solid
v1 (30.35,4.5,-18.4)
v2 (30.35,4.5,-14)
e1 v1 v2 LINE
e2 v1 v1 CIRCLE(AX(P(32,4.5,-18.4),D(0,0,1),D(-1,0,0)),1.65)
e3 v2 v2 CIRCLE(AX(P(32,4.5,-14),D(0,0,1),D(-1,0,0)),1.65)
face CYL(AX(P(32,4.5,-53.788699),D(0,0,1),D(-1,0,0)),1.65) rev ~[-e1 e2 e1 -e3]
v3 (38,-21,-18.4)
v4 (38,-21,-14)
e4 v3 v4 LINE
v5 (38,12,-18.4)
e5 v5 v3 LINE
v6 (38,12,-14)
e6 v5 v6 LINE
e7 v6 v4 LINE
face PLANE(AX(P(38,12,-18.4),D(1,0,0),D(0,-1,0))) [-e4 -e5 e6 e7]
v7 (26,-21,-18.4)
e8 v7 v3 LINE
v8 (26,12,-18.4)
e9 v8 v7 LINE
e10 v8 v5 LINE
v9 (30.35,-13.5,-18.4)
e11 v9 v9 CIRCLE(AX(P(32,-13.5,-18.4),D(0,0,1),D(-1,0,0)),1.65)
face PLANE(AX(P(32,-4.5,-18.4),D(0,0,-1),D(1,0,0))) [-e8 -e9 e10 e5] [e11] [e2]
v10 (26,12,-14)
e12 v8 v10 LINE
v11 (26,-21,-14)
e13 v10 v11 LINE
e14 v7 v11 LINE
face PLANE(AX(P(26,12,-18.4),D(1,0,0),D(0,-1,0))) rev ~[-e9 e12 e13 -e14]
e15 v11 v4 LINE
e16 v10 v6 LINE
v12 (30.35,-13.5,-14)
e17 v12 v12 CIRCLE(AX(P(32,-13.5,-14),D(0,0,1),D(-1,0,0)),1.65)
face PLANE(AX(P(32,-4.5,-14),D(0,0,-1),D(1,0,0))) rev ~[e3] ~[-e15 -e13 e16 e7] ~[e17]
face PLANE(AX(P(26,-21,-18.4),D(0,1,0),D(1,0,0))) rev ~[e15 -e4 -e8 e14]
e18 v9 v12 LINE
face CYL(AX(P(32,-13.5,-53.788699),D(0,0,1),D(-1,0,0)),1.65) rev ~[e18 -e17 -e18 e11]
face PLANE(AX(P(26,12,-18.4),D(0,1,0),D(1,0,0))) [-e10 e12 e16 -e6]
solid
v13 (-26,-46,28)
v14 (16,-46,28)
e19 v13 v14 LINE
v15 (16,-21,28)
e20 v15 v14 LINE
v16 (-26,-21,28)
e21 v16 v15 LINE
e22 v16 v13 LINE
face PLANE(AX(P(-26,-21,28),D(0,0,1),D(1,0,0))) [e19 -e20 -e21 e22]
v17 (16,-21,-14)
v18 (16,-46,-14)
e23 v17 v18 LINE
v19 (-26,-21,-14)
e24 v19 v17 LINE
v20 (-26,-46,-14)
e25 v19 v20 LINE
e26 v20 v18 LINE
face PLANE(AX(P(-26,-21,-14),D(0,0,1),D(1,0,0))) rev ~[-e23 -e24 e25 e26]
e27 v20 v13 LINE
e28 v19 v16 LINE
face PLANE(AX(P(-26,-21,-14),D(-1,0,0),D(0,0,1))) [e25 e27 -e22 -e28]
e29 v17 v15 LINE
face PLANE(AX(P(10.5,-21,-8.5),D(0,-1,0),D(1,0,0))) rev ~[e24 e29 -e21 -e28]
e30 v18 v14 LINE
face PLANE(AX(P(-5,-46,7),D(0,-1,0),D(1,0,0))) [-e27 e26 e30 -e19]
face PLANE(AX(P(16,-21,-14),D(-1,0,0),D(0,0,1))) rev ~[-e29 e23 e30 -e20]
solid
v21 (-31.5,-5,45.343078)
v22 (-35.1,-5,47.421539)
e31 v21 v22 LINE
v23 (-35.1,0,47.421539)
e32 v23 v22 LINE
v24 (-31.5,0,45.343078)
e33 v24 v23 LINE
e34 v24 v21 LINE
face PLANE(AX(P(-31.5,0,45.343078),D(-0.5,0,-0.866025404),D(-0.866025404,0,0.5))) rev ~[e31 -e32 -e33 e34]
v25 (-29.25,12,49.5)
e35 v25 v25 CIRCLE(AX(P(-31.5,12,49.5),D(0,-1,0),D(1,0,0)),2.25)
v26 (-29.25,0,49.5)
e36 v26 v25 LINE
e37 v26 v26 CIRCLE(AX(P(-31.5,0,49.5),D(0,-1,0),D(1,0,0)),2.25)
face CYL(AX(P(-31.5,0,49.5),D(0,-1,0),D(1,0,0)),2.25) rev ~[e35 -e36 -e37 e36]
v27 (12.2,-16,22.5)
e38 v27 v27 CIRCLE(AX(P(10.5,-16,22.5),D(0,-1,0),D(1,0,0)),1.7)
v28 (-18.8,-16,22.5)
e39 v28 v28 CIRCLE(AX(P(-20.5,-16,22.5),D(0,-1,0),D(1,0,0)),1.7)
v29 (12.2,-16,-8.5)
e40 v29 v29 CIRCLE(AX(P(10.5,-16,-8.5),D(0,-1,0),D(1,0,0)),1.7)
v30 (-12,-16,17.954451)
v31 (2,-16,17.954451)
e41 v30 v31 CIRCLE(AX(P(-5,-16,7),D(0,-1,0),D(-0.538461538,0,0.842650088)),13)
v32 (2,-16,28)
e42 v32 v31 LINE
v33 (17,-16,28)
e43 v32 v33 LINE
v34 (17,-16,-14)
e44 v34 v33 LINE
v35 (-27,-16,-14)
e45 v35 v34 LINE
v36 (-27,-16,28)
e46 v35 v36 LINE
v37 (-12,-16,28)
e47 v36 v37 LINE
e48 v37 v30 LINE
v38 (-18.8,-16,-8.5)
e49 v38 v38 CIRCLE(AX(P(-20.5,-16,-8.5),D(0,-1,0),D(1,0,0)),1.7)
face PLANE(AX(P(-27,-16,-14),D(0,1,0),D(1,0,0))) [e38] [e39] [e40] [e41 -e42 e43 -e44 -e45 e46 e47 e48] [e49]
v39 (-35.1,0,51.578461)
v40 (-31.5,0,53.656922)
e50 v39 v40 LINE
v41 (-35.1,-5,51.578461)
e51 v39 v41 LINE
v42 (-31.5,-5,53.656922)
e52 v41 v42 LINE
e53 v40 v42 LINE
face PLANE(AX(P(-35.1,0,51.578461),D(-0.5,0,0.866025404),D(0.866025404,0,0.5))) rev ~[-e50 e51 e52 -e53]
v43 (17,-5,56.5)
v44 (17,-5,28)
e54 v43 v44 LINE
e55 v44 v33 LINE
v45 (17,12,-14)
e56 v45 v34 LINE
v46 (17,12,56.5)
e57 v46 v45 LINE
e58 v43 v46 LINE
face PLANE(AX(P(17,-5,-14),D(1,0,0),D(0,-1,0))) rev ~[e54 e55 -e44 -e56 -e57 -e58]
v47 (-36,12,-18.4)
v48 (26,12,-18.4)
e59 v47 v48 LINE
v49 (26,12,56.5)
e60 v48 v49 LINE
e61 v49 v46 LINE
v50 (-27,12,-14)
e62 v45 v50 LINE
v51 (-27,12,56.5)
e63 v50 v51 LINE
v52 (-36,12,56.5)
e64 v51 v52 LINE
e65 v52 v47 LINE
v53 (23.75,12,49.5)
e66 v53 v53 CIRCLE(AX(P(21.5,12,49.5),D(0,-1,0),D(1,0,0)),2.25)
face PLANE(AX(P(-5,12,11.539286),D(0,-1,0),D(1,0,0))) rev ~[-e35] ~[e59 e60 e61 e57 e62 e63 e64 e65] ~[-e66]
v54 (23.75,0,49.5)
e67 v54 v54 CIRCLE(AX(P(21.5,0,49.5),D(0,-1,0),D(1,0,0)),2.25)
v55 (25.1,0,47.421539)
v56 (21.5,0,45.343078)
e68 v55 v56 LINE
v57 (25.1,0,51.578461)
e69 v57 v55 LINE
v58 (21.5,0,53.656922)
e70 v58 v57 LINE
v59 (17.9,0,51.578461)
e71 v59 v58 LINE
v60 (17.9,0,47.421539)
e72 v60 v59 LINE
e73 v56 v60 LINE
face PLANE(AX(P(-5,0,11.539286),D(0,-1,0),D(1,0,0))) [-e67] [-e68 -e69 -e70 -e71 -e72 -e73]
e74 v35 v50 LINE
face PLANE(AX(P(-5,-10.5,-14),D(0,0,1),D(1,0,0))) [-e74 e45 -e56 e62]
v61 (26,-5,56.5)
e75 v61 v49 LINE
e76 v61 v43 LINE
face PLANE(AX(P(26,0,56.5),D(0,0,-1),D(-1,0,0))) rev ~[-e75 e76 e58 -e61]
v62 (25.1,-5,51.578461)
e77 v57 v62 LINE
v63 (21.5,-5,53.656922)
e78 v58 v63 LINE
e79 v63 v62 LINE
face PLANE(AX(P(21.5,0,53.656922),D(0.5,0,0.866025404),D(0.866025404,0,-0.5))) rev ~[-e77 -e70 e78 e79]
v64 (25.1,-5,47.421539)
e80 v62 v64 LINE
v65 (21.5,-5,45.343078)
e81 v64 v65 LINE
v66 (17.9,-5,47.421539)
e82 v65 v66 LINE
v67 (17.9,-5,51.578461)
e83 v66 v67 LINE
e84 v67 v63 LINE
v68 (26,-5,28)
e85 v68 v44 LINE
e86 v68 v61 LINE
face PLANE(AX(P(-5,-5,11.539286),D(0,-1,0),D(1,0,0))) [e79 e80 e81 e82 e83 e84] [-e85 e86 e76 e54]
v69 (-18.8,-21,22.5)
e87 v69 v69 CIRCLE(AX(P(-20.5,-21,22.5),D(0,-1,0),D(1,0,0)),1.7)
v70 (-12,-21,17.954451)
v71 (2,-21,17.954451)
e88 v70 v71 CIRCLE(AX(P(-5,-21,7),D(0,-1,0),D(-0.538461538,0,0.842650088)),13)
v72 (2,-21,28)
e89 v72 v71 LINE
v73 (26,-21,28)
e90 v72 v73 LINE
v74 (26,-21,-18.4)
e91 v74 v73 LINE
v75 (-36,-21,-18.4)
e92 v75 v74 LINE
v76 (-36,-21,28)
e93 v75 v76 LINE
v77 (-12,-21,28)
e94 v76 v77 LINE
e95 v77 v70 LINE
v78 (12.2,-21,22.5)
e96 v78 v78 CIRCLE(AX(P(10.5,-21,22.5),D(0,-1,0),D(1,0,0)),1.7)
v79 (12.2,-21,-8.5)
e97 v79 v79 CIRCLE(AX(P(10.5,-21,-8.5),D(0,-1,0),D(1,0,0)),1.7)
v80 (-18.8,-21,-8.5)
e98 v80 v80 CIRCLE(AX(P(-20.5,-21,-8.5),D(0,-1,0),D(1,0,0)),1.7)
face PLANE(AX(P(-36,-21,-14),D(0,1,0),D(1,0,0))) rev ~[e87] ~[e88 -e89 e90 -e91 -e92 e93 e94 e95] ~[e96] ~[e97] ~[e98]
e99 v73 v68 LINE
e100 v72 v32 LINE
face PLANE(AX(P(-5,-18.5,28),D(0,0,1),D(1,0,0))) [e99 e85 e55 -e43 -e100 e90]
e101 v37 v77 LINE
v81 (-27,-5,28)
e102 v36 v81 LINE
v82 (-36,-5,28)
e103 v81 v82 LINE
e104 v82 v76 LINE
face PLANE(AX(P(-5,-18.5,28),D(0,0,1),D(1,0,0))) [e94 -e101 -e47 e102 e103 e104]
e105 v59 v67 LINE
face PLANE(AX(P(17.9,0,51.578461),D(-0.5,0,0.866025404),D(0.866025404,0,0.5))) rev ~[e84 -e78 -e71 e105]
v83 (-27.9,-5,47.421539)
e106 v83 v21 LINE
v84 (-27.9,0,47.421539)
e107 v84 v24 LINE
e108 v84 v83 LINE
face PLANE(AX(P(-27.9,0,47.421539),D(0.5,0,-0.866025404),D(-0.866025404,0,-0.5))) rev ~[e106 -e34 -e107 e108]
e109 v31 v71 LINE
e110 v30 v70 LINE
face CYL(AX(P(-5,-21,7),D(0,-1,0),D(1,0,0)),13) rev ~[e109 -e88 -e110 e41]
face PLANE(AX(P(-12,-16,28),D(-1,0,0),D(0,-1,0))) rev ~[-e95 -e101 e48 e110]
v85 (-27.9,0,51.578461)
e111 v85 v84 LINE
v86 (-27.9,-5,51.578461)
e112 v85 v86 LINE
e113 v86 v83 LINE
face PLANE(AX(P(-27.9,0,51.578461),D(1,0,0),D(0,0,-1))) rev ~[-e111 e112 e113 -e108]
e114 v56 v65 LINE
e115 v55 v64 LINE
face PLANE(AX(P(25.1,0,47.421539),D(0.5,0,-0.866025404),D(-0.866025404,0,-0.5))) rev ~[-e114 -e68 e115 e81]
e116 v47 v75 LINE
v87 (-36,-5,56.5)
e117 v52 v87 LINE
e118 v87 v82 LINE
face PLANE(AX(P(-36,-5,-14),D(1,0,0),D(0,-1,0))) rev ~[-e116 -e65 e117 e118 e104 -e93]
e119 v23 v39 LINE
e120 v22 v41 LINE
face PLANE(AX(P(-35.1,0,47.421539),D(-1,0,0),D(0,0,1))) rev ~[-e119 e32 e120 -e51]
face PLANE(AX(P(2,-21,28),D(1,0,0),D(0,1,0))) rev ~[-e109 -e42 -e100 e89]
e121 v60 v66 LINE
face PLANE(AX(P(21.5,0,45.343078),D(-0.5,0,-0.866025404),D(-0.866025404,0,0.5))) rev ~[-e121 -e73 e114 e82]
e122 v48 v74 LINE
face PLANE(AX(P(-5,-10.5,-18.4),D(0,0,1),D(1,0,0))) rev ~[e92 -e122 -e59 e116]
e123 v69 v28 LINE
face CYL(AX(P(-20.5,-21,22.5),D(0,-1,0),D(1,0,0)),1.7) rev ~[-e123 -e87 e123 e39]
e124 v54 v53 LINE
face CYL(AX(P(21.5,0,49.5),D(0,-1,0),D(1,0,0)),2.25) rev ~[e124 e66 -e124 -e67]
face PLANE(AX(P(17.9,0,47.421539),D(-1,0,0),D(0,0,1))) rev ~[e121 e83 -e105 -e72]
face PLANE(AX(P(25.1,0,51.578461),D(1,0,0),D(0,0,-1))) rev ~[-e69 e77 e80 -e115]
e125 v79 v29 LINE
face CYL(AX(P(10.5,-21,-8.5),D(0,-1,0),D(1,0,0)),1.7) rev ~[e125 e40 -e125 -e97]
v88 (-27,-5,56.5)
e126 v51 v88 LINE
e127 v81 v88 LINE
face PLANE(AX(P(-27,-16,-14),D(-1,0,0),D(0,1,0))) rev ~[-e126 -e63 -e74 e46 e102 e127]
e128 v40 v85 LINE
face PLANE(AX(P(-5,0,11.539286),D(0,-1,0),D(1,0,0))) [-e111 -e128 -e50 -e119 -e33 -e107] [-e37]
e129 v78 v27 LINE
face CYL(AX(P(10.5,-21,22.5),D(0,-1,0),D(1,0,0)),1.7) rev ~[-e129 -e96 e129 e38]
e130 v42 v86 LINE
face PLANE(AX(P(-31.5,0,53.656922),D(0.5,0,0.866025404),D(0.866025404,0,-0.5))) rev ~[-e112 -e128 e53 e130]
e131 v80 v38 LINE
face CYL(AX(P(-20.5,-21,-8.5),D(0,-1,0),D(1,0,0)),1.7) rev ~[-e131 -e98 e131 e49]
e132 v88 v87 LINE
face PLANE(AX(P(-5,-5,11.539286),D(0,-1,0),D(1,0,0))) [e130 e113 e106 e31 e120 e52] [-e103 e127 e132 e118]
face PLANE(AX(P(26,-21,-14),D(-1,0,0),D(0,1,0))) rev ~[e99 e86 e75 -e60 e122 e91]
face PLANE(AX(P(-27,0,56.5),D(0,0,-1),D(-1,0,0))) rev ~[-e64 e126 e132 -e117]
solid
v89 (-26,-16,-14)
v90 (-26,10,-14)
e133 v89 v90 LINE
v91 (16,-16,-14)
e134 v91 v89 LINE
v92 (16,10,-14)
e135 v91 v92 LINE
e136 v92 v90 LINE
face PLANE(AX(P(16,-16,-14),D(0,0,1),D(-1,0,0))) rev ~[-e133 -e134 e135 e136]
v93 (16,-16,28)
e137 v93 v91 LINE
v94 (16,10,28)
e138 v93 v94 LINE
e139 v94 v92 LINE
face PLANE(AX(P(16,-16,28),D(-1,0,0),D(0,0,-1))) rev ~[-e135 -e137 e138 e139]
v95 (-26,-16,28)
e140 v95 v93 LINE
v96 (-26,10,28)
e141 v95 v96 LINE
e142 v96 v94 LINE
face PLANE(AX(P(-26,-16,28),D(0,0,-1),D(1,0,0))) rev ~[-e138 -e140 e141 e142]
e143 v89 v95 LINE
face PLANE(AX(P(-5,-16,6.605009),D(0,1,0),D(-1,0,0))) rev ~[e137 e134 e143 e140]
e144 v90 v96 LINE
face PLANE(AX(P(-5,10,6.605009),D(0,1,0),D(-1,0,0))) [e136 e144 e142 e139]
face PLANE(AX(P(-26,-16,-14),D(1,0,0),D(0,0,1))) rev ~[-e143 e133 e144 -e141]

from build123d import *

# Parameters (mm, degrees)
F1_R      = 2.25
F2_DEPTH  = 12
F4_DEPTH  = 5
F5_W      = 44
F5_H      = 11
F5_H_2    = 5
F6_DEPTH  = 7
F7_DEPTH  = 42
F8_R      = 1.7
F8_R_2    = 13
F9_DEPTH  = 5
F11_REACH = 63.8670687473
F12_R     = 1.7
F13_DEPTH = 26
F14_W     = 42
F14_H     = 42
F14_R     = 1.7
F14_R_2   = 13
F15_DEPTH = 25
F19_DEPTH = 2.6
F20_W     = 12
F20_H     = 33
F21_DEPTH = 4.4
F22_D     = 3.3


with BuildPart() as f2:
    # F1 (on Front) → F2 (new body)
    with BuildSketch(Plane.XZ):
        Polygon((-27, 56.5), (-36, 56.5), (-36, -21), (26, -21), (26, 56.5), (17, 56.5), (17, -14), (-27, -14), align=None)
        with Locations((-31.5, 49.5)):
            Circle(F1_R, mode=Mode.SUBTRACT)
        with Locations((21.5, 49.5)):
            Circle(F1_R, mode=Mode.SUBTRACT)
    extrude(amount=-F2_DEPTH)

    # F3 (on face) → F4 (join)
    with BuildSketch(Plane.XZ):
        Polygon((-27, -14), (-27, 56.5), (-36, 56.5), (-36, -21), (26, -21), (26, 56.5), (17, 56.5), (17, -14), align=None)
        Polygon((-31.5, 53.6569219382), (-27.9, 51.5784609691), (-27.9, 47.4215390309), (-31.5, 45.3430780618), (-35.1, 47.4215390309), (-35.1, 51.5784609691), align=None, mode=Mode.SUBTRACT)
        Polygon((21.5, 53.6569219382), (25.1, 51.5784609691), (25.1, 47.4215390309), (21.5, 45.3430780618), (17.9, 47.4215390309), (17.9, 51.5784609691), align=None, mode=Mode.SUBTRACT)
    extrude(amount=F4_DEPTH)

    # F5 (on face) → F6 (join, through all)
    with BuildSketch(Plane.XY.offset(-14)):
        with Locations((-5, -10.5)):
            Rectangle(F5_W, F5_H)
        with Locations((-5, -18.5)):
            Rectangle(F5_W, F5_H_2)
        Polygon((-27, -16), (-27, -5), (-36, -5), (-36, -21), (-27, -21), align=None)
        Polygon((26, -5), (17, -5), (17, -16), (17, -21), (26, -21), align=None)
    extrude(amount=-F6_DEPTH)

    # F5 (on face) → F7 (join)
    with BuildSketch(Plane.XY.offset(-14)):
        with Locations((-5, -18.5)):
            Rectangle(F5_W, F5_H_2)
        Polygon((-27, -16), (-27, -5), (-36, -5), (-36, -21), (-27, -21), align=None)
        Polygon((26, -5), (17, -5), (17, -16), (17, -21), (26, -21), align=None)
    extrude(amount=F7_DEPTH)

    # F8 (on face) → F9 (cut, through all)
    with BuildSketch(Plane.XZ.offset(21)):
        with Locations((-20.5, 22.5)):
            Circle(F8_R)
        with Locations((-5, 7)):
            Circle(F8_R_2)
        with Locations((-20.5, -8.5)):
            Circle(F8_R)
        with Locations((10.5, -8.5)):
            Circle(F8_R)
        with Locations((10.5, 22.5)):
            Circle(F8_R)
    extrude(amount=-F9_DEPTH, mode=Mode.SUBTRACT)

    f11_end = f2.faces().sort_by_distance((-18, -18.5, 7))[0]
    # F10 (on face) → F11 (cut, up to a face of the model that its end follows)
    with BuildSketch(Plane.XY.offset(28)):
        Polygon((2, -16), (-5, -16), (-12, -16), (-12, -21), (2, -21), align=None)
    f11_long = extrude(amount=-F11_REACH, mode=Mode.PRIVATE)
    add(split(f11_long, bisect_by=f11_end, keep=Keep.ALL, mode=Mode.PRIVATE).solids().sort_by_distance((-5, -18.5, 28))[0], mode=Mode.SUBTRACT)

    # F19 (cut, through all): a face of the model
    f19_faces = [f2.faces().sort_by_distance(p)[0] for p in [
        (-5, -4.5, -21),
    ]]
    extrude(f19_faces, amount=-F19_DEPTH, mode=Mode.SUBTRACT)


with BuildPart() as f13:
    # F12 (on face) → F13 (new body)
    with BuildSketch(Plane(origin=(0, -16, 0), x_dir=(-1, 0, 0), z_dir=(0, 1, 0))):
        with BuildLine():
            Line((-16, -14), (26, -14))
            Line((26, -14), (26, 28))
            Line((26, 28), (12, 28))
            Line((12, 28), (12, 17.9544511501))
            ThreePointArc((12, 17.9544511501), (5, -6), (-2, 17.9544511501))
            Line((-2, 17.9544511501), (-2, 28))
            Line((-2, 28), (-16, 28))
            Line((-16, 28), (-16, -14))
        make_face()
        with Locations((-10.5, -8.5)):
            Circle(F12_R, mode=Mode.SUBTRACT)
        with Locations((20.5, -8.5)):
            Circle(F12_R, mode=Mode.SUBTRACT)
        with Locations((-10.5, 22.5)):
            Circle(F12_R, mode=Mode.SUBTRACT)
        with Locations((20.5, 22.5)):
            Circle(F12_R, mode=Mode.SUBTRACT)
        with BuildLine():
            Line((12, 17.9544511501), (12, 28))
            Line((12, 28), (-2, 28))
            Line((-2, 28), (-2, 17.9544511501))
            ThreePointArc((-2, 17.9544511501), (5, -6), (12, 17.9544511501))
        make_face()
        with Locations((-10.5, 22.5)):
            Circle(F12_R)
        with Locations((20.5, 22.5)):
            Circle(F12_R)
        with Locations((-10.5, -8.5)):
            Circle(F12_R)
        with Locations((20.5, -8.5)):
            Circle(F12_R)
    extrude(amount=F13_DEPTH)


with BuildPart() as f15:
    # F14 (on face) → F15 (new body)
    with BuildSketch(Plane.XZ.offset(21)):
        with Locations((-5, 7)):
            Rectangle(F14_W, F14_H)
        with Locations((-20.5, -8.5)):
            Circle(F14_R, mode=Mode.SUBTRACT)
        with Locations((10.5, -8.5)):
            Circle(F14_R, mode=Mode.SUBTRACT)
        with Locations((-20.5, 22.5)):
            Circle(F14_R, mode=Mode.SUBTRACT)
        with Locations((-5, 7)):
            Circle(F14_R_2, mode=Mode.SUBTRACT)
        with Locations((10.5, 22.5)):
            Circle(F14_R, mode=Mode.SUBTRACT)
    extrude(amount=F15_DEPTH)

    # F8 (on face) → F15, piece 2 (join)
    with BuildSketch(Plane.XZ.offset(21)):
        with Locations((-20.5, 22.5)):
            Circle(F8_R)
    extrude(amount=F15_DEPTH)

    # F8 (on face) → F15, piece 3 (join)
    with BuildSketch(Plane.XZ.offset(21)):
        with Locations((-5, 7)):
            Circle(F8_R_2)
    extrude(amount=F15_DEPTH)

    # F8 (on face) → F15, piece 4 (join)
    with BuildSketch(Plane.XZ.offset(21)):
        with Locations((-20.5, -8.5)):
            Circle(F8_R)
    extrude(amount=F15_DEPTH)

    # F8 (on face) → F15, piece 5 (join)
    with BuildSketch(Plane.XZ.offset(21)):
        with Locations((10.5, 22.5)):
            Circle(F8_R)
    extrude(amount=F15_DEPTH)

    # F8 (on face) → F15, piece 6 (join)
    with BuildSketch(Plane.XZ.offset(21)):
        with Locations((10.5, -8.5)):
            Circle(F8_R)
    extrude(amount=F15_DEPTH)


with BuildPart() as f21:
    # F20 (on face) → F21 (new body, through all)
    with BuildSketch(Plane(origin=(0, 0, -18.4), x_dir=(1, 0, 0), z_dir=(0, 0, -1))):
        with Locations((32, 4.5)):
            Rectangle(F20_W, F20_H)
    extrude(amount=-F21_DEPTH)

    # F22 (through all)
    with Locations(Plane(origin=(0, 0, -18.4), x_dir=(1, 0, 0), z_dir=(0, 0, -1))):
        with Locations((32, -4.5), (32, 13.5)):
            Hole(F22_D / 2)


solid = Compound([f2.part, f13.part, f15.part, f21.part])
